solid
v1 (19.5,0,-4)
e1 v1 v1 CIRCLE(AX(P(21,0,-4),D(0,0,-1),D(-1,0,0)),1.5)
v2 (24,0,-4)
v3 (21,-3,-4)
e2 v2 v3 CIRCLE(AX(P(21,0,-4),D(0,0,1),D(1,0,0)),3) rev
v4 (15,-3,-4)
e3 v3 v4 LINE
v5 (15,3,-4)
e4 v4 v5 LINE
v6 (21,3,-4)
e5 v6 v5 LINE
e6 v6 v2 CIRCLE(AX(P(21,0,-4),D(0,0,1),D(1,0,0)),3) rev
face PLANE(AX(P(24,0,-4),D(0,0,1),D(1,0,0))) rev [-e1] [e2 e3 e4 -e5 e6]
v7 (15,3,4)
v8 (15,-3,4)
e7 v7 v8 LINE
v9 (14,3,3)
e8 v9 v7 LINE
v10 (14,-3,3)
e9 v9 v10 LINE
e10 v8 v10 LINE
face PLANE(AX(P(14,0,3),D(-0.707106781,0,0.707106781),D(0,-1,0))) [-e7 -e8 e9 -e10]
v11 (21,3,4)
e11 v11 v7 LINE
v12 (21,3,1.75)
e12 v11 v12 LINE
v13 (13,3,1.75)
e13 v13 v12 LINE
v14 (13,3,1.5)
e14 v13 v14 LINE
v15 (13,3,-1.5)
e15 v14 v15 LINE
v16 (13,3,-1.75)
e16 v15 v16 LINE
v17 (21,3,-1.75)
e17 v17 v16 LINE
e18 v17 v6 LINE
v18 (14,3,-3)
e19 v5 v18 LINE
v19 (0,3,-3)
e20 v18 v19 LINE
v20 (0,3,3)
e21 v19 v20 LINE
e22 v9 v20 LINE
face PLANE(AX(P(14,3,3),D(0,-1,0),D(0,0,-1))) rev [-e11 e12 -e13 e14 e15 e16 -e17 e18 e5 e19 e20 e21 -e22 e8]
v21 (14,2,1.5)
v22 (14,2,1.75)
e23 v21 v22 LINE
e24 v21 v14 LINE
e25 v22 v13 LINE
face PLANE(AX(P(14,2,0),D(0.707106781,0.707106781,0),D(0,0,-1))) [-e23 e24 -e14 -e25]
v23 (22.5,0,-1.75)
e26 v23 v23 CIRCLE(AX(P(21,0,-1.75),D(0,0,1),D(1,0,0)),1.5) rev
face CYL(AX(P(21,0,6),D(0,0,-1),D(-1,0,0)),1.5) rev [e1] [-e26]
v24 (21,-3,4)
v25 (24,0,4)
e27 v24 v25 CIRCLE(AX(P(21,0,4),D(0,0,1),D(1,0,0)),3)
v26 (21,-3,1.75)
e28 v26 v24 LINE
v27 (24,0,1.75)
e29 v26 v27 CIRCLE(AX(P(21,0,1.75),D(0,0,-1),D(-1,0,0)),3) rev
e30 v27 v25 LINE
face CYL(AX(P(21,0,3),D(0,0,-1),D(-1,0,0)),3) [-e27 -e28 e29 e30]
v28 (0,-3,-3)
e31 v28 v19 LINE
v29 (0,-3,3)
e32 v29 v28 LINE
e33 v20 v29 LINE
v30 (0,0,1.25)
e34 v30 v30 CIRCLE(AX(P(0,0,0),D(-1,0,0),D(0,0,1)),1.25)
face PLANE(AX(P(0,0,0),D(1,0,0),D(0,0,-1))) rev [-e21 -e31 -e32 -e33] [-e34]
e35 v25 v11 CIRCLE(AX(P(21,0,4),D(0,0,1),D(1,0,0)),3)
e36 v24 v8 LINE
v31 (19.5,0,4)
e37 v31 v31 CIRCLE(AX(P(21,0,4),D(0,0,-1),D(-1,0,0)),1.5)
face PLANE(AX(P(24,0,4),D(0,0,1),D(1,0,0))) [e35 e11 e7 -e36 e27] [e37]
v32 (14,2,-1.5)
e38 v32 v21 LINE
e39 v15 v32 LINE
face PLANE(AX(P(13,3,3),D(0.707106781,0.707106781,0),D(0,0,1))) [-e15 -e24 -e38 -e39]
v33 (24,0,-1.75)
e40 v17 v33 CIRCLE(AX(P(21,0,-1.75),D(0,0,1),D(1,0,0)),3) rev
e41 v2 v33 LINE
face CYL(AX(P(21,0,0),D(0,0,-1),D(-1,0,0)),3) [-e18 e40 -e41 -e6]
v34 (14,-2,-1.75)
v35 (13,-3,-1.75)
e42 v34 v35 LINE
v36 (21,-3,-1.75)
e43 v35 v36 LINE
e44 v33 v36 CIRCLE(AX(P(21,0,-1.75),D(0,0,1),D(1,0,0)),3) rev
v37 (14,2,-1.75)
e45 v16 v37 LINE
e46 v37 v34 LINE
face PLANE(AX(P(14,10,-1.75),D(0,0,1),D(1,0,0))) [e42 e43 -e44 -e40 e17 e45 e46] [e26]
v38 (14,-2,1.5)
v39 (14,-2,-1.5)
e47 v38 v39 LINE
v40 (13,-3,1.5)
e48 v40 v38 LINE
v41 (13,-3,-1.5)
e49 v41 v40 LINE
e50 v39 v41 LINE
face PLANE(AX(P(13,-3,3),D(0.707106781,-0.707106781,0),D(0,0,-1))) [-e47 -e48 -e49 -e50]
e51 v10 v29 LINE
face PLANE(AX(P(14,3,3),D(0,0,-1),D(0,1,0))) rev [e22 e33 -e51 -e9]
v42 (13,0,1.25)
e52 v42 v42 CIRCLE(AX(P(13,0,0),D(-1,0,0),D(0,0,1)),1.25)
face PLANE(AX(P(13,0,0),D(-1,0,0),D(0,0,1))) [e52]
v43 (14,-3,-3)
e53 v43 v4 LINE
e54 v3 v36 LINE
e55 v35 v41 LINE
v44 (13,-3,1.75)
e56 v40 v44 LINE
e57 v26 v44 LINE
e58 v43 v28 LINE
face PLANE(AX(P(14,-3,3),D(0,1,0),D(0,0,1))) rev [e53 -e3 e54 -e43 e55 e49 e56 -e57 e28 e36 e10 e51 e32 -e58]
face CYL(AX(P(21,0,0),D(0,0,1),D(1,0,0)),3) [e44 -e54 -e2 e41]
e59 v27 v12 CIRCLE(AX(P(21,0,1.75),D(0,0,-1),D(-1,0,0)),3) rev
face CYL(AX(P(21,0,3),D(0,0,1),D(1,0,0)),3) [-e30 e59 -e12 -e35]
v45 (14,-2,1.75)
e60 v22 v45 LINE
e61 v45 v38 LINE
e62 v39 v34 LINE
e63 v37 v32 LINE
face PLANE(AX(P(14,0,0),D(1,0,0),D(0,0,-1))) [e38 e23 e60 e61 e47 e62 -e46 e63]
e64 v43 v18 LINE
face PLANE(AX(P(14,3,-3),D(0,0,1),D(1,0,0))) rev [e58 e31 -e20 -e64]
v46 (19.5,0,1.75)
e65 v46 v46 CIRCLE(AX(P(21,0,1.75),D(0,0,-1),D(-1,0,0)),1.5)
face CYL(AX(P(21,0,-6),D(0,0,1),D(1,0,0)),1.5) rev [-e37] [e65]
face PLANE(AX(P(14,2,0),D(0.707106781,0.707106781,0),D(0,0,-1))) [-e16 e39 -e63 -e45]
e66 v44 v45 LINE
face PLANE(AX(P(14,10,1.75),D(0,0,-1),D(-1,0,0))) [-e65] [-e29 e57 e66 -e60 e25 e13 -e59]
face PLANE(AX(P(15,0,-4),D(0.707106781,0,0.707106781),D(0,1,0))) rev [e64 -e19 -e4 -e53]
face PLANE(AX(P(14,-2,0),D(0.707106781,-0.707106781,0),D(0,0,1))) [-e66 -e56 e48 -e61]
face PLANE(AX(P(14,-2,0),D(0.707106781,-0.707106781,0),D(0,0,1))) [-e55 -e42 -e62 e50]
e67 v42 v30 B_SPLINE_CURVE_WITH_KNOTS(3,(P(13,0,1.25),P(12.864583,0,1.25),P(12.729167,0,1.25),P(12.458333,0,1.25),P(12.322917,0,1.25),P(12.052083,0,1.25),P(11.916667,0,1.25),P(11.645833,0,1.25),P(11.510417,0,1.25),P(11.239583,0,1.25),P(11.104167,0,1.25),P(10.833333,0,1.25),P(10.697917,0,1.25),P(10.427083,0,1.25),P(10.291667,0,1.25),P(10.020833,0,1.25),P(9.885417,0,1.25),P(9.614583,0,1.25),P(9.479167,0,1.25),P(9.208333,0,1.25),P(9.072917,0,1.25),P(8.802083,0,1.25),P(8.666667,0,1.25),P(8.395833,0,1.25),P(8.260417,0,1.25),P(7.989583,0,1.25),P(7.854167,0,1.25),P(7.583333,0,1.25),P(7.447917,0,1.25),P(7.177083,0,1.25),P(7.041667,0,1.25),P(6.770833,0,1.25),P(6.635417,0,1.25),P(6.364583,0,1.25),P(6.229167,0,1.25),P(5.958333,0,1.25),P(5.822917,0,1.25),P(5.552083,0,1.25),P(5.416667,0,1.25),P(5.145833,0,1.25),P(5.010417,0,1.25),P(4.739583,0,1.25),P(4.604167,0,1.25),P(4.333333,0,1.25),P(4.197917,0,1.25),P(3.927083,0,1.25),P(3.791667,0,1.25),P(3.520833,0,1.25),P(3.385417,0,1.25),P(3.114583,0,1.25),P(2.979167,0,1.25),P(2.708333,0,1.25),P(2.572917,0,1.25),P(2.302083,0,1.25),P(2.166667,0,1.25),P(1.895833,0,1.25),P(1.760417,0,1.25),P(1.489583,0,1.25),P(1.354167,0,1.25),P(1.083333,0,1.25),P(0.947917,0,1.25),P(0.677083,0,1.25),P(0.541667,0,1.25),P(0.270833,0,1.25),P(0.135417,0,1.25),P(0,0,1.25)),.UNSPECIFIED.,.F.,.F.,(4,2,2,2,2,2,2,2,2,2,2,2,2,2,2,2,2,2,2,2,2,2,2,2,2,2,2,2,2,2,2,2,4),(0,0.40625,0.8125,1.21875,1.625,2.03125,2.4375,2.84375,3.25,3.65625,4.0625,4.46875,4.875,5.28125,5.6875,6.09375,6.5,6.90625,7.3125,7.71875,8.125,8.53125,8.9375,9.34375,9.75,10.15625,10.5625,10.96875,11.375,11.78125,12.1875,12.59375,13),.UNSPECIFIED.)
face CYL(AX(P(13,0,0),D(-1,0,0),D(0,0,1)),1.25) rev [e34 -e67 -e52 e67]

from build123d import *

# Parameters (mm, degrees)
SKETCH1_W                = 6
SKETCH1_H                = 6
BOSS_EXTRUDE1_DEPTH      = 14
SKETCH2_W                = 1
SKETCH2_H                = 6
SKETCH2_W_2              = 1.5
BOSS_EXTRUDE2_DEPTH      = 10
FILLET1_R                = 3
SKETCH3_R                = 1.5
CUT_EXTRUDE1_DEPTH       = 10
CHAMFER1_SIZE            = 1
CHAMFER2_SIZE            = 1
FILLET1_OF_MIRROR2_R     = 3
CHAMFER1_OF_MIRROR2_SIZE = 1
SKETCH4_R                = 1.25
CUT_EXTRUDE2_DEPTH       = 13
CHAMFER3_SIZE            = 1
CUT_EXTRUDE3_DEPTH       = 10
CUT_EXTRUDE3_DEPTH_BACK  = 10
SKETCH5_W                = 10
SKETCH5_H                = 0.25
CUT_EXTRUDE4_DEPTH       = 10
CUT_EXTRUDE4_DEPTH_BACK  = 10
SKETCH6_W                = 10
SKETCH6_H                = 0.25
CHAMFER4_SIZE            = 1


with BuildPart() as part:
    # Sketch1 → Boss-Extrude1 (new body)
    with BuildSketch(Plane(origin=(0, 0, 0), x_dir=(0, 0, -1), z_dir=(1, 0, 0))):
        Rectangle(SKETCH1_W, SKETCH1_H)
    boss_extrude1 = extrude(amount=BOSS_EXTRUDE1_DEPTH)

    # Sketch2 → Boss-Extrude2 (add)
    with BuildSketch(Plane(origin=(14, 0, 0), x_dir=(0, 0, -1), z_dir=(1, 0, 0))):
        with Locations((3.5, 0)):
            Rectangle(SKETCH2_W, SKETCH2_H)
        with Locations((2.25, 0)):
            Rectangle(SKETCH2_W_2, SKETCH2_H)
    boss_extrude2 = extrude(amount=BOSS_EXTRUDE2_DEPTH)

    # Fillet1
    fillet1_edges = [part.edges().sort_by_distance(p)[0] for p in [
        (24, 3, -2.75),
        (24, -3, -2.75),
    ]]
    fillet(fillet1_edges, radius=FILLET1_R - 0.0001)  # a hair under: the kernel refuses the full size

    # Sketch3 → Cut-Extrude1 (cut)
    with BuildSketch(Plane(origin=(0, 0, -4), x_dir=(-1, 0, 0), z_dir=(0, 0, -1))):
        with Locations((-21, 0)):
            Circle(SKETCH3_R)
    cut_extrude1 = extrude(amount=-CUT_EXTRUDE1_DEPTH, mode=Mode.SUBTRACT)

    # Chamfer1
    chamfer1_edges = [part.edges().sort_by_distance(p)[0] for p in [
        (14, 0, -4),
    ]]
    chamfer(chamfer1_edges, length=CHAMFER1_SIZE - 0.0001)  # a hair under: the kernel refuses the full size

    # Chamfer2
    chamfer2_edges = [part.edges().sort_by_distance(p)[0] for p in [
        (14, 3, 0.75),
        (14, -3, 0.75),
    ]]
    chamfer(chamfer2_edges, length=CHAMFER2_SIZE)

    # Mirror2: Boss-Extrude1, Boss-Extrude2, Cut-Extrude1 across plane
    add(boss_extrude1.mirror(Plane(origin=(0, 0, 0), x_dir=(1, 0, 0), z_dir=(0, 0, -1))))
    add(boss_extrude2.mirror(Plane(origin=(0, 0, 0), x_dir=(1, 0, 0), z_dir=(0, 0, -1))))
    add(cut_extrude1.mirror(Plane(origin=(0, 0, 0), x_dir=(1, 0, 0), z_dir=(0, 0, -1))), mode=Mode.SUBTRACT)

    # Fillet1 of Mirror2
    fillet1_of_mirror2_edges = [part.edges().sort_by_distance(p)[0] for p in [
        (24, 3, 2.75),
        (24, -3, 2.75),
    ]]
    fillet(fillet1_of_mirror2_edges, radius=FILLET1_OF_MIRROR2_R - 0.0001)  # a hair under: the kernel refuses the full size

    # Chamfer1 of Mirror2
    chamfer1_of_mirror2_edges = [part.edges().sort_by_distance(p)[0] for p in [
        (14, 0, 4),
    ]]
    chamfer(chamfer1_of_mirror2_edges, length=CHAMFER1_OF_MIRROR2_SIZE - 0.0001)  # a hair under: the kernel refuses the full size

    # Sketch4 → Cut-Extrude2 (cut)
    with BuildSketch(Plane.ZY):
        Circle(SKETCH4_R)
    extrude(amount=-CUT_EXTRUDE2_DEPTH, mode=Mode.SUBTRACT)

    # Chamfer3
    chamfer3_edges = [part.edges().sort_by_distance(p)[0] for p in [
        (14, -3, 0),
        (14, 3, 0),
    ]]
    chamfer(chamfer3_edges, length=CHAMFER3_SIZE)

    # Sketch5 → Cut-Extrude3 (cut, two sides: drawn at the far end of the back side and taken through both)
    with BuildSketch(Plane(origin=(0, 0, 0), x_dir=(1, 0, 0), z_dir=(0, 1, 0)).offset(-CUT_EXTRUDE3_DEPTH_BACK)):
        with Locations((19, -1.625)):
            Rectangle(SKETCH5_W, SKETCH5_H)
    extrude(amount=CUT_EXTRUDE3_DEPTH + CUT_EXTRUDE3_DEPTH_BACK, mode=Mode.SUBTRACT)

    # Sketch6 → Cut-Extrude4 (cut, two sides: drawn at the far end of the back side and taken through both)
    with BuildSketch(Plane(origin=(0, 0, 0), x_dir=(1, 0, 0), z_dir=(0, 1, 0)).offset(-CUT_EXTRUDE4_DEPTH_BACK)):
        with Locations((19, 1.625)):
            Rectangle(SKETCH6_W, SKETCH6_H)
    extrude(amount=CUT_EXTRUDE4_DEPTH + CUT_EXTRUDE4_DEPTH_BACK, mode=Mode.SUBTRACT)

    # Chamfer4
    chamfer4_edges = [part.edges().sort_by_distance(p)[0] for p in [
        (14, -3, 1.625),
        (14, -3, -1.625),
        (14, 3, -1.625),
        (14, 3, 1.625),
    ]]
    chamfer(chamfer4_edges, length=CHAMFER4_SIZE - 0.0001)  # a hair under: the kernel refuses the full size


solid = part.part
